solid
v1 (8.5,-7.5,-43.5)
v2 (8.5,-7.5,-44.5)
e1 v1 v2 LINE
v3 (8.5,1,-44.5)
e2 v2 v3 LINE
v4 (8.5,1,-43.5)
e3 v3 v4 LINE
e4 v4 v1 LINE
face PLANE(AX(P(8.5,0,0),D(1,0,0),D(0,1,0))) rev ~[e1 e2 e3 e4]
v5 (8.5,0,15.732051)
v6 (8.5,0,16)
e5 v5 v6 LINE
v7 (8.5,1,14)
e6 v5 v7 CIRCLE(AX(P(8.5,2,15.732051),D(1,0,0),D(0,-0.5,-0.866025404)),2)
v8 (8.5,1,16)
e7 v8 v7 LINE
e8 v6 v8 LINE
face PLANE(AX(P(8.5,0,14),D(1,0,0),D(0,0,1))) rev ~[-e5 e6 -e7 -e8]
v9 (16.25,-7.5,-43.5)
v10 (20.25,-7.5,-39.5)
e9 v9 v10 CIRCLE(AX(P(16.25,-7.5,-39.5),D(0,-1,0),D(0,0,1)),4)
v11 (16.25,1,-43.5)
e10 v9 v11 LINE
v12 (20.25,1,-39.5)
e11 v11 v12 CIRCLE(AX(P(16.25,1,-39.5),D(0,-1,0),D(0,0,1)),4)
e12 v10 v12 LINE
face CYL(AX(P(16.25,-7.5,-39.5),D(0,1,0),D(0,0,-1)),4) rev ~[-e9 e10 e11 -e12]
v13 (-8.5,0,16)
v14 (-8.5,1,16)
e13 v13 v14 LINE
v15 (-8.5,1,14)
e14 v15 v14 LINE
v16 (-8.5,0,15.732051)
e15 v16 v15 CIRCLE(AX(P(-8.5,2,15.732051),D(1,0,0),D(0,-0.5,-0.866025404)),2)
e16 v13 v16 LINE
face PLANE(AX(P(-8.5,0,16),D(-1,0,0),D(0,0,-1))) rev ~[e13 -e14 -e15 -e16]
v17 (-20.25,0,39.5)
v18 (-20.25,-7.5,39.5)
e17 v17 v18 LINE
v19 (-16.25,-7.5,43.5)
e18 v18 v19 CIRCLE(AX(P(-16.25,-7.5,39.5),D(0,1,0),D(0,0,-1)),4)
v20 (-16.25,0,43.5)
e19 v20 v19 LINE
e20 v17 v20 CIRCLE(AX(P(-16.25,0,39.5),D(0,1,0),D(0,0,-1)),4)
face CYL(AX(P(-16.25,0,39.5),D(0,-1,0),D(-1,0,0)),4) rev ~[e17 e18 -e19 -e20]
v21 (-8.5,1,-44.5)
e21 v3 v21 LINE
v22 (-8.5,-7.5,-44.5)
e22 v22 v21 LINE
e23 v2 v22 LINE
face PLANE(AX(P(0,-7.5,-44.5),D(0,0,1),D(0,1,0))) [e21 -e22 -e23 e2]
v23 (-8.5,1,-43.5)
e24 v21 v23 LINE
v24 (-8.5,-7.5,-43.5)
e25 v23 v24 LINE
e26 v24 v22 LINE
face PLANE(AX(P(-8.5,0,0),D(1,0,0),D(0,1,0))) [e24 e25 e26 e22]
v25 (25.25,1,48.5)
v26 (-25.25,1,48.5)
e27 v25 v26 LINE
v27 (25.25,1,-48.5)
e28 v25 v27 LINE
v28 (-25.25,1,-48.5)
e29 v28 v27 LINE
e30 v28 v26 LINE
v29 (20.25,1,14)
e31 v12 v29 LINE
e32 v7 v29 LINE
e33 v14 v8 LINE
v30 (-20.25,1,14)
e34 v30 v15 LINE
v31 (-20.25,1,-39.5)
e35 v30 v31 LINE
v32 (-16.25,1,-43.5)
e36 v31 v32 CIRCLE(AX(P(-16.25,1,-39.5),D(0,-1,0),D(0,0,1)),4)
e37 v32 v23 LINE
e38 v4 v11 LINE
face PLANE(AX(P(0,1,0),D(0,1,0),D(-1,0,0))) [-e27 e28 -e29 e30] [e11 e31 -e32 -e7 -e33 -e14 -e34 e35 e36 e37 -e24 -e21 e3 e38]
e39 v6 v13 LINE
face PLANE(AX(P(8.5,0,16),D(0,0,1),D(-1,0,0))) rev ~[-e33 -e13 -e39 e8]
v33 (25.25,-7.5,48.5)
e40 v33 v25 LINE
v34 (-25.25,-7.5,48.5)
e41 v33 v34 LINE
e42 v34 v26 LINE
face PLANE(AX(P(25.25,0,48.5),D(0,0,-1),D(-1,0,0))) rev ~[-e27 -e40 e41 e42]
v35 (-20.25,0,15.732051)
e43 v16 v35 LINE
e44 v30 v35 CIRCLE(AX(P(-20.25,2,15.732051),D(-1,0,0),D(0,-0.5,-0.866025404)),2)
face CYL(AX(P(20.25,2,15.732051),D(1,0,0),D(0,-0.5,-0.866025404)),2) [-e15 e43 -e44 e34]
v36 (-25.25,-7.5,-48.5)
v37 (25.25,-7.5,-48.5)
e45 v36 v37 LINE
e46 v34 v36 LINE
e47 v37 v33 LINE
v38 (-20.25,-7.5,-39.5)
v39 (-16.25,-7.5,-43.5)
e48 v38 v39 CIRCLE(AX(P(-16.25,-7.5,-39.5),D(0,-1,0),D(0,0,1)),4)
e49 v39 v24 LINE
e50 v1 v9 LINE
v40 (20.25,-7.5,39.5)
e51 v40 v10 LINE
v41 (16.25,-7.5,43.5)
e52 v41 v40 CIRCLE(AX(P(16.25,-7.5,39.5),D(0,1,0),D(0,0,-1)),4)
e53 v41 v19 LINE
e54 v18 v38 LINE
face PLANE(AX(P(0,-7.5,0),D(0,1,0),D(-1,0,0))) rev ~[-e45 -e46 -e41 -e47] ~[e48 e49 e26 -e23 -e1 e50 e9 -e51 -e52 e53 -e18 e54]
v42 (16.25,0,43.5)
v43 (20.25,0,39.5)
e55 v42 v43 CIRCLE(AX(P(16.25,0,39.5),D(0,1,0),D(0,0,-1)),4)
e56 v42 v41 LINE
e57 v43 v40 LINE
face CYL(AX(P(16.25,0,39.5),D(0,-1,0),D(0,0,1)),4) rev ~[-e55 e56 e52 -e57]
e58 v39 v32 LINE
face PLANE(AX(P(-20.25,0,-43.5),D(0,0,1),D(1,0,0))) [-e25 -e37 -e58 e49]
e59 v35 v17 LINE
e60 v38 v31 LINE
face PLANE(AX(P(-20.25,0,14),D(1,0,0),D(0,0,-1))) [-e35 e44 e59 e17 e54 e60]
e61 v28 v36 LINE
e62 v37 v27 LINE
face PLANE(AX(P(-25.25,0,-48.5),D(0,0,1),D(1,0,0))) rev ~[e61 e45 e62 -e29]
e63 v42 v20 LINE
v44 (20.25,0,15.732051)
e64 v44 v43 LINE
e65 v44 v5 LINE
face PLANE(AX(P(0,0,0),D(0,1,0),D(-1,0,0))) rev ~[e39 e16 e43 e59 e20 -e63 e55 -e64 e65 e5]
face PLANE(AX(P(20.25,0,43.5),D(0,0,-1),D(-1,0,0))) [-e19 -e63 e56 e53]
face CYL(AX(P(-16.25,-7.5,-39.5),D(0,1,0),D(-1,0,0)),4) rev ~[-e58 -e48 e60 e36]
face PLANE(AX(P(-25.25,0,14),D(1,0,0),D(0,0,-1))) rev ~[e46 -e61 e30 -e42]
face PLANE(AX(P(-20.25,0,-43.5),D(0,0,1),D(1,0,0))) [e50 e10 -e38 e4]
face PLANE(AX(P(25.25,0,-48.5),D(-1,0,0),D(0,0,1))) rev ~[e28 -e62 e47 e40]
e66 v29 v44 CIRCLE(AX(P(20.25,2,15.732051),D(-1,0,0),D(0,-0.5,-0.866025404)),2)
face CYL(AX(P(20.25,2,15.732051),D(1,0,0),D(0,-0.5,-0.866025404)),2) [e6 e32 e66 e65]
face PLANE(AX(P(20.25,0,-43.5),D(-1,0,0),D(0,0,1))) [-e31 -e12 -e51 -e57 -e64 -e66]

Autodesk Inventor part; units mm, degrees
ref_plane "YZ Plane" through (0, 0, 0) normal (1, 0, 0) x (0, 1, 0)
ref_plane "XZ Plane" through (0, 0, 0) normal (0, 1, 0) x (-1, 0, 0)
ref_plane "XY Plane" through (0, 0, 0) normal (0, 0, 1) x (1, 0, 0)
sketch "Boceto1" plane through (0, 0, 0) normal (0, 1, 0) x (-1, 0, 0)
  line L0 (20.25, -43.5) -> (-20.25, -43.5)
  line L1 (-20.25, -43.5) -> (-20.25, 43.5)
  line L2 (-20.25, 43.5) -> (20.25, 43.5)
  line L3 (20.25, 43.5) -> (20.25, -43.5)
  line L4 (20.25, -43.5) -> (-20.25, 43.5) construction
  line L5 (-20.25, -43.5) -> (20.25, 43.5) construction
  line L6 (25.25, -48.5) -> (-25.25, -48.5)
  line L7 (-25.25, -48.5) -> (-25.25, 48.5)
  line L8 (-25.25, 48.5) -> (25.25, 48.5)
  line L9 (25.25, 48.5) -> (25.25, -48.5)
  line L10 (20.25, 43.5) -> (-20.25, 43.5)
  line L11 (-20.25, 43.5) -> (-20.25, 14)
  line L12 (-20.25, 14) -> (20.25, 14)
  line L13 (20.25, 14) -> (20.25, 43.5)
  line L14 (25.25, 14) -> (-25.25, 14)
  line L15 (21.25, -44.5) -> (-21.25, -44.5)
  line L16 (-21.25, -44.5) -> (-21.25, 44.5)
  line L17 (-21.25, 44.5) -> (21.25, 44.5)
  line L18 (21.25, 44.5) -> (21.25, -44.5)
  line L19 (8.5, 14) -> (-8.5, 14)
  line L20 (-8.5, 14) -> (-8.5, 16)
  line L21 (-8.5, 16) -> (8.5, 16)
  line L22 (8.5, 16) -> (8.5, 14)
  point P0 (0, 0)
  point P1 (0, 0)
  point P2 (-20.25, 14)
  point P3 (-20.25, 14)
  point P4 (20.25, 14)
  point P5 (20.25, 14)
  point P6 (0, 14)
  dimension "d0" = 40.5
  dimension "d1" = 87
  dimension "d2" = 5
  dimension "d3" = 29.5
  dimension "d19" = 1
  dimension "d29" = 17
  dimension "d32" = 2
extrude "Extrusión4" add sketch "Boceto1" against normal blind 7.5 contours L3 L14 L18 L15 L16 L1 L0 | L3 L2 L1 L14 L16 L17 L18 | L18 L17 L16 L14 L7 L8 L9 | L14 L9 L6 L7 L16 L15 L18
extrude "Extrusión5" add sketch "Boceto1" along normal blind 1 contours L3 L14 L18 L15 L16 L1 L0 | L12 L22 L21 L20 L1 L2 L3 | L3 L2 L1 L14 L16 L17 L18 | L12 L20 L21 L22 | L18 L17 L16 L14 L7 L8 L9 | L14 L9 L6 L7 L16 L15 L18
fillet "Empalme2" radius 4 4 edges at (-20.25, -3.25, -43.5) (20.25, -3.25, -43.5) (20.25, -3.75, 43.5) (-20.25, -3.75, 43.5)
fillet "Empalme3" radius 2 1 edges at (0, 0, 14)
sketch "Boceto2" plane through (0, 0, 0) normal (1, 0, 0) x (0, 1, 0)
  line L0 (1, 14) -> (1, -39.5) construction
  line L1 (1, 14) -> (4, 14)
  line L2 (4, 14) -> (4, 9)
  line L3 (1, -3.5) -> (11, -3.5) construction
  line L4 (4, 14) -> (11, -3.5)
  line L5 (11, -3.5) -> (9.143, 1.1424)
  line L6 (0, 15) -> (0, -39.5) construction
  line L7 (1, -43.5) -> (1, -39.5) construction
  line L8 (1, -43.5) -> (13, -43.5)
  line L9 (13, -43.5) -> (10.5, -43.5)
  line L10 (1, -43.5) -> (13, -43.5)
  line L11 (13, -43.5) -> (13, -44.5)
  line L12 (13, -44.5) -> (1, -44.5)
  line L13 (1, -44.5) -> (1, -43.5)
  line L14 (10.5, -43.5) -> (10.5, -38.5)
  line L15 (10.5, -38.5) -> (9.5, -38.5)
  line L16 (9.5, -38.5) -> (9.5, -43.5)
  line L17 (9.5, -43.5) -> (10.5, -43.5)
  line L18 (10.5, -43.5) -> (10.5, -38.5)
  line L19 (13, -43.5) -> (13, -3.5) construction
  line L20 (13, -43.5) -> (13, -36.5) construction
  line L21 (13, -36.5) -> (12, -36.5) construction
  line L22 (13, -36.5) -> (13, -43.5)
  line L23 (11, -3.5) -> (13, -36.5)
  line L24 (1, 14) -> (-1, 14)
  line L25 (-1, 14) -> (-1, 43.5)
  line L26 (0, 43.5) -> (-7.5, 43.5) projected
  line L27 (0, 39.5) -> (0, 15.7321) projected
  line L28 (-7.5, 48.5) -> (-7.5, -48.5) construction
  line L29 (1, -43.5) -> (-7.5, -43.5)
  line L30 (-7.5, -43.5) -> (-7.5, -44.5)
  line L31 (-7.5, -44.5) -> (1, -44.5)
  line L32 (1, -44.5) -> (1, -43.5)
  point P0 (0, 0)
  dimension "d22" = 3
  dimension "d23" = 5
  dimension "d24" = 10
  dimension "d25" = 17.5
  dimension "d26" = 5
  dimension "d33" = 12
  dimension "d36" = 1
  dimension "d37" = 5
  dimension "d38" = 1
  dimension "d39" = 40
  dimension "d40" = 7
  dimension "d41" = 1
  dimension "d48" = 1
feature "Barrido1" [suppressed]
extrude "Extrusión7" [suppressed]
extrude "Extrusión8" cut sketch "Boceto1" along normal blind 10 contours L12 L20 L21 L22
extrude "Extrusión9" cut sketch "Boceto2" along normal mid plane 17 contours L13 L31 L30 L29
properties part number "manija_puerta_marco_front_right_v3"
